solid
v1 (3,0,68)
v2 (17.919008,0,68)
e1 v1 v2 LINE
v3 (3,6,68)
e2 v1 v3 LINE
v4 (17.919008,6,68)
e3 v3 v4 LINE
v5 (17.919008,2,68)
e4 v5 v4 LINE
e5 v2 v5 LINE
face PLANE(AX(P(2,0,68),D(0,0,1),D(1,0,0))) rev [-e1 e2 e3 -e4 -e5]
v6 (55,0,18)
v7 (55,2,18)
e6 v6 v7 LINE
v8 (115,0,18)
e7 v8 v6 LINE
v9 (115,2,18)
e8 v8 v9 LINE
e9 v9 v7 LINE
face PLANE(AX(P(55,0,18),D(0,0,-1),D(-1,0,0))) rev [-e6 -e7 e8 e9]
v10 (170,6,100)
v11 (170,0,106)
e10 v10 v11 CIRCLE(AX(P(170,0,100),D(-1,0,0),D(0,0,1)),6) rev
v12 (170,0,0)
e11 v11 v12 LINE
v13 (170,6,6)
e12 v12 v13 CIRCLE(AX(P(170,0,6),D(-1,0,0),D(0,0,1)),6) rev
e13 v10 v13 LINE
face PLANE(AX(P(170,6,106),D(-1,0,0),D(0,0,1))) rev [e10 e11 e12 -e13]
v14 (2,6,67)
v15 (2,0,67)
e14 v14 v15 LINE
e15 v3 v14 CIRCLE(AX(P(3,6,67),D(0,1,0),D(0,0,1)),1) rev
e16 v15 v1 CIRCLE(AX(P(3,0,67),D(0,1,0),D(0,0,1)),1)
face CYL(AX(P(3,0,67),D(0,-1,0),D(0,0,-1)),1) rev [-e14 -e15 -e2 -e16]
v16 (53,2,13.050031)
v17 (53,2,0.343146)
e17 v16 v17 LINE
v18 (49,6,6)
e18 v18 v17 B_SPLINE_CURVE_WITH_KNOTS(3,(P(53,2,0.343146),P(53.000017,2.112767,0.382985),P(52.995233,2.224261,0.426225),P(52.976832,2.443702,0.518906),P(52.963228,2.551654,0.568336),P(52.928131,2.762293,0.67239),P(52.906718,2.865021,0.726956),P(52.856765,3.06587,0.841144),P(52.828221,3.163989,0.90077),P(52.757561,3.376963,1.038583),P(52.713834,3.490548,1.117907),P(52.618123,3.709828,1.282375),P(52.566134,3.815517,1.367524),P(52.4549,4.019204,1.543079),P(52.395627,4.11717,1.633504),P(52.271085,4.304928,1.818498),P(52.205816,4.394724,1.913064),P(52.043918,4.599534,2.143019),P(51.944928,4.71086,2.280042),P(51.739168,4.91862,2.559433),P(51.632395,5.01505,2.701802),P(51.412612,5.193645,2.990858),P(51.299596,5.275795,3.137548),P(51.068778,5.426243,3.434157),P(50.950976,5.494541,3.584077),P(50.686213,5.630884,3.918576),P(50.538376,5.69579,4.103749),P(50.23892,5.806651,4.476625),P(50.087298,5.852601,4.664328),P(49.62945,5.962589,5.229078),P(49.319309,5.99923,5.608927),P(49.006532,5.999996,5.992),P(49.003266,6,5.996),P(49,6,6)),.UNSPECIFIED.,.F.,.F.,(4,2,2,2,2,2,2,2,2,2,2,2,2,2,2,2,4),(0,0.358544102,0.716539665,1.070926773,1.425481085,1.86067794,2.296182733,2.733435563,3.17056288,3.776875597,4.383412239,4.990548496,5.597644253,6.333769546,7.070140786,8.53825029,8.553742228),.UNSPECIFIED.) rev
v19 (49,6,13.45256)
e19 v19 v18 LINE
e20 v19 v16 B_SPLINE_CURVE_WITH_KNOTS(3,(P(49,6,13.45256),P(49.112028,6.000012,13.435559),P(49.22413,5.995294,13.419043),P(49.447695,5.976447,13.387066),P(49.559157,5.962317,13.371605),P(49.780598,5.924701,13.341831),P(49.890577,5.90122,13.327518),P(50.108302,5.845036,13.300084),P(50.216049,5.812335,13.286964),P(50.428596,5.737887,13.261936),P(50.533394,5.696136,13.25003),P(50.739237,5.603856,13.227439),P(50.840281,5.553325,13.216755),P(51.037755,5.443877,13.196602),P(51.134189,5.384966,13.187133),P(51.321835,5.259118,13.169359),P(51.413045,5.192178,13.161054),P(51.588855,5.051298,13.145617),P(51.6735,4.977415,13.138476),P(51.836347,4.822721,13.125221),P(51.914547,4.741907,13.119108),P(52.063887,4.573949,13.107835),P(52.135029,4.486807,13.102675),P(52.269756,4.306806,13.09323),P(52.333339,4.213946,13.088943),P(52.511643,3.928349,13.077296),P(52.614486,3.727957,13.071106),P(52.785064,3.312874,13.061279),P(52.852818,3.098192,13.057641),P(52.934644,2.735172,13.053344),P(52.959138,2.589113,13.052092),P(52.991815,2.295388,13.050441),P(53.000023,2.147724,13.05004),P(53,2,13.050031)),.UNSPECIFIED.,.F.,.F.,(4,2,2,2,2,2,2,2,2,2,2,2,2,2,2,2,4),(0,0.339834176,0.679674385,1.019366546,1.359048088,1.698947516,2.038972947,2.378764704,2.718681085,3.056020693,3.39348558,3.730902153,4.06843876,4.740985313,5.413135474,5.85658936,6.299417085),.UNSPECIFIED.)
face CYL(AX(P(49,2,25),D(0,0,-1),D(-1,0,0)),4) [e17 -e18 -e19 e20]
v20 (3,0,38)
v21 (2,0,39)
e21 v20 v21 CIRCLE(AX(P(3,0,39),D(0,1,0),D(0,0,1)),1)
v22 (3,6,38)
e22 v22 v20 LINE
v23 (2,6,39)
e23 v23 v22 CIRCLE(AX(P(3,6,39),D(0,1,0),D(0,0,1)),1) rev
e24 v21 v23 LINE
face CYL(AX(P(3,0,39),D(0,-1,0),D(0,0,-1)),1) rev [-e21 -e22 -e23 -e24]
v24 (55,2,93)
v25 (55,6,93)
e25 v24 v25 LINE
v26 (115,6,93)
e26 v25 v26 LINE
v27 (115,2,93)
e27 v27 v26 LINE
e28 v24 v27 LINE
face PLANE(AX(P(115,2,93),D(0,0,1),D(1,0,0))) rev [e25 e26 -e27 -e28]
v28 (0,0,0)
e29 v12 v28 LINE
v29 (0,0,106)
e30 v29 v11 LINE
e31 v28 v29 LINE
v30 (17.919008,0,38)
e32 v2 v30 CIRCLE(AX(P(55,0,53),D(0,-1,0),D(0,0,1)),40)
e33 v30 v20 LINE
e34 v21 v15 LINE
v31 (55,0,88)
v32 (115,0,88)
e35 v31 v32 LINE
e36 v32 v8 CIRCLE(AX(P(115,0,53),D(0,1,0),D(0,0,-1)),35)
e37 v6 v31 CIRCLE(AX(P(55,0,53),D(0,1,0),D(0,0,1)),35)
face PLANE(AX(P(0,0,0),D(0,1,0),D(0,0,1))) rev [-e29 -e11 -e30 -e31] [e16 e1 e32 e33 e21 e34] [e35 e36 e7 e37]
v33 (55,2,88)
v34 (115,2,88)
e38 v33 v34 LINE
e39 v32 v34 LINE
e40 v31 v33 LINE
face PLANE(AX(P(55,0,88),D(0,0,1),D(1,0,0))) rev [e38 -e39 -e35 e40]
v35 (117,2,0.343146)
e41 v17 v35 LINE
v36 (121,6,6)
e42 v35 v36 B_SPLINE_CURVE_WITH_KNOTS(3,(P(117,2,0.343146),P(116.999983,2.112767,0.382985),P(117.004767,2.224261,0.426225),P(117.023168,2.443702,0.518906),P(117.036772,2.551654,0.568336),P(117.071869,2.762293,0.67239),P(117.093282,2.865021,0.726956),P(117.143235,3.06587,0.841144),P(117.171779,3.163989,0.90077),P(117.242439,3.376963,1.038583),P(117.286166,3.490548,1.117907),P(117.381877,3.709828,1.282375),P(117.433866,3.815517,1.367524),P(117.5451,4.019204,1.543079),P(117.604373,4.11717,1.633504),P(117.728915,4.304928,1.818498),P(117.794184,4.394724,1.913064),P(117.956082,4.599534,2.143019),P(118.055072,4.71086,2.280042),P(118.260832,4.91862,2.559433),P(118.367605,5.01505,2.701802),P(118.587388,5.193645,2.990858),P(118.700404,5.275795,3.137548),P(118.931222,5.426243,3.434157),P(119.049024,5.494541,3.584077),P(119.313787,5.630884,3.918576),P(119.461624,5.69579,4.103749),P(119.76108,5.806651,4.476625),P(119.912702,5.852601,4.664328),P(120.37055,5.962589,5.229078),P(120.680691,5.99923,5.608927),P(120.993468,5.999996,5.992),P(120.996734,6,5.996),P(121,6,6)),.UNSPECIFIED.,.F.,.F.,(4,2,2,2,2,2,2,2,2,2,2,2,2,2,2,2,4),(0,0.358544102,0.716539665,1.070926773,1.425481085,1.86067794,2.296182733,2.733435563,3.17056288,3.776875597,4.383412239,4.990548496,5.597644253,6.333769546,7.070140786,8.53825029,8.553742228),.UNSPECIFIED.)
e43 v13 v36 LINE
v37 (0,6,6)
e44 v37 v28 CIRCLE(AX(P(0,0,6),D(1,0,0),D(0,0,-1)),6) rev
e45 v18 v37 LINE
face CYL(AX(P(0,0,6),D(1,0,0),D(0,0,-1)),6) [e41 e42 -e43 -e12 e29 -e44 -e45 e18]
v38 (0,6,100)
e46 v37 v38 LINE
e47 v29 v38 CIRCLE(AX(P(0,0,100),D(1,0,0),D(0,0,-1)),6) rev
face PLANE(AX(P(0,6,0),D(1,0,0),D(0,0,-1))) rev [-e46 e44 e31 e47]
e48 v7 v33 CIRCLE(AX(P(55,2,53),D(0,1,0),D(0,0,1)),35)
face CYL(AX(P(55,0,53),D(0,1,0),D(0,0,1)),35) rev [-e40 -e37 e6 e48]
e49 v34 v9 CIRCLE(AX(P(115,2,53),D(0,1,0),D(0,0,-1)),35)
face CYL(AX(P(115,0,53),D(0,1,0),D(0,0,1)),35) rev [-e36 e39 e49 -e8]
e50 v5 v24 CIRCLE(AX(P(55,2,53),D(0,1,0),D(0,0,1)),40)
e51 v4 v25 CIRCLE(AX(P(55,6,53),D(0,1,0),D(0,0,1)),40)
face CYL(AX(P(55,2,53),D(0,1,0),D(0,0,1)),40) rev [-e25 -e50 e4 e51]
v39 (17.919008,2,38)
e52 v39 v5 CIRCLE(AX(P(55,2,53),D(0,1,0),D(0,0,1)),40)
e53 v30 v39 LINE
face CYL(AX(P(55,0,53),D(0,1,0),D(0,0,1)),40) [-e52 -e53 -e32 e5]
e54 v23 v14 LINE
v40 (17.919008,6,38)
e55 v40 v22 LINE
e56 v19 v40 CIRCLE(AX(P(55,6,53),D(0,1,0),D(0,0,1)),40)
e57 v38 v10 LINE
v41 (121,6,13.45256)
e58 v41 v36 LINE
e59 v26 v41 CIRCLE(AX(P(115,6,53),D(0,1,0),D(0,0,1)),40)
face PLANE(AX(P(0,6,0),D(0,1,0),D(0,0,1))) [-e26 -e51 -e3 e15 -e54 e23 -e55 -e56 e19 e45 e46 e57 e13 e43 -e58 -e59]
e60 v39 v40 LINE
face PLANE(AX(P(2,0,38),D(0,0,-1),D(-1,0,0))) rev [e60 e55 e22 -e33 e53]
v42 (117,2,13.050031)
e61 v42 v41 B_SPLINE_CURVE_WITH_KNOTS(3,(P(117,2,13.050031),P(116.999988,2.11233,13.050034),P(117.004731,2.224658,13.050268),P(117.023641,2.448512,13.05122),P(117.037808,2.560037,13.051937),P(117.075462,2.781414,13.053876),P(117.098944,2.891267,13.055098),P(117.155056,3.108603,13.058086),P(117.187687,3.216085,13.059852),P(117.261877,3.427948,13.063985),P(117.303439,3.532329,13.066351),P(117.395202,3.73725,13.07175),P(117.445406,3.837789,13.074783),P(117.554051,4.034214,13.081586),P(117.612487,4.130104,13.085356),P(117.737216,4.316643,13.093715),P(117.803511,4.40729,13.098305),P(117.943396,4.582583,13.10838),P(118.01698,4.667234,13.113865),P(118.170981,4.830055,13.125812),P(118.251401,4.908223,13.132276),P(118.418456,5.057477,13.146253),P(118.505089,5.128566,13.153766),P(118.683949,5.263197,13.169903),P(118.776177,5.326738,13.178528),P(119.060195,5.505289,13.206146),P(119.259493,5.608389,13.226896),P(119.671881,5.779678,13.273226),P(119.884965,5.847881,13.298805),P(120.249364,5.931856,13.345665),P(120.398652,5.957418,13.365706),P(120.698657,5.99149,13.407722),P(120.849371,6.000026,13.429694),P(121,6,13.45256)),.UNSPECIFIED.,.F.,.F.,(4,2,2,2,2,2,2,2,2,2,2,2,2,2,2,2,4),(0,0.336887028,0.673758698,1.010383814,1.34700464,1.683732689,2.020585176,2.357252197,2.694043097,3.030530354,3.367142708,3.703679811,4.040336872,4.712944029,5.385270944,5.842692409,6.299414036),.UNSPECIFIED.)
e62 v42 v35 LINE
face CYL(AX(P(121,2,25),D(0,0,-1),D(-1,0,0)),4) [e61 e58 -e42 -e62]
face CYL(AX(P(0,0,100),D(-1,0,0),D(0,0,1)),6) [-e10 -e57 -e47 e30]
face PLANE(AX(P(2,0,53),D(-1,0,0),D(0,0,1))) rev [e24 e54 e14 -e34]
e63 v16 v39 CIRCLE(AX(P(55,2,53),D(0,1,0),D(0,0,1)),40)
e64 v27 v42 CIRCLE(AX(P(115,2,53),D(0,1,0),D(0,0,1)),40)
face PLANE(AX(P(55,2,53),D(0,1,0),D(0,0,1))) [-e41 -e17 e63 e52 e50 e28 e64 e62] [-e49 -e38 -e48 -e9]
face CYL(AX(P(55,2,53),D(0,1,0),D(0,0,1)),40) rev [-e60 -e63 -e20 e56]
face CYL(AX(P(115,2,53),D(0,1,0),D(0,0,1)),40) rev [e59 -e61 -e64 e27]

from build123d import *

# Parameters (mm, degrees)
SKETCH1_W           = 170
SKETCH1_H           = 106
BOSS_EXTRUDE1_DEPTH = 6
FILLET1_R           = 6
CUT_EXTRUDE1_DEPTH  = 4
CUT_EXTRUDE2_DEPTH  = 201.429538741
CUT_EXTRUDE3_DEPTH  = 25
CUT_EXTRUDE4_DEPTH  = 201.379639771
FILLET2_R           = 1


with BuildPart() as part:
    # Sketch1 → Boss-Extrude1 (new body)
    with BuildSketch(Plane(origin=(0, 0, 0), x_dir=(1, 0, 0), z_dir=(0, 1, 0))):
        with Locations((85, -53)):
            Rectangle(SKETCH1_W, SKETCH1_H)
    extrude(amount=BOSS_EXTRUDE1_DEPTH)

    # Fillet1
    fillet1_edges = [part.edges().sort_by_distance(p)[0] for p in [
        (85, 6, 106),
        (85, 6, 0),
    ]]
    fillet(fillet1_edges, radius=FILLET1_R - 0.0001)  # a hair under: the kernel refuses the full size

    # Sketch2 → Cut-Extrude1 (cut)
    with BuildSketch(Plane(origin=(0, 6, 0), x_dir=(1, 0, 0), z_dir=(0, 1, 0))):
        with BuildLine():
            Line((55, -13), (115, -13))
            ThreePointArc((115, -13), (155, -53), (115, -93))
            Line((115, -93), (55, -93))
            ThreePointArc((55, -93), (15, -53), (55, -13))
        make_face()
    extrude(amount=-CUT_EXTRUDE1_DEPTH, mode=Mode.SUBTRACT)

    # Sketch3 → Cut-Extrude2 (cut, through all)
    with BuildSketch(Plane(origin=(0, 6, 0), x_dir=(1, 0, 0), z_dir=(0, 1, 0))):
        with BuildLine():
            Line((2, -53), (2, -38))
            Line((2, -38), (17.919007565, -38))
            ThreePointArc((17.919007565, -38), (15, -53), (17.919007565, -68))
            Line((17.919007565, -68), (2, -68))
            Line((2, -68), (2, -53))
        make_face()
    extrude(amount=-CUT_EXTRUDE2_DEPTH, mode=Mode.SUBTRACT)

    # Sketch5 → Cut-Extrude3 (cut)
    with BuildSketch(Plane.XY):
        with BuildLine():
            Line((49, 6), (121, 6))
            ThreePointArc((121, 6), (118.171572875, 4.828427125), (117, 2))
            Line((117, 2), (53, 2))
            ThreePointArc((53, 2), (51.828427125, 4.828427125), (49, 6))
        make_face()
    extrude(amount=CUT_EXTRUDE3_DEPTH, mode=Mode.SUBTRACT)

    # Sketch8 → Cut-Extrude4 (cut, through all)
    with BuildSketch(Plane(origin=(0, 2, 0), x_dir=(1, 0, 0), z_dir=(0, 1, 0))):
        with BuildLine():
            Line((55, -18), (115, -18))
            ThreePointArc((115, -18), (150, -53), (115, -88))
            Line((115, -88), (55, -88))
            ThreePointArc((55, -88), (20, -53), (55, -18))
        make_face()
    extrude(amount=-CUT_EXTRUDE4_DEPTH, mode=Mode.SUBTRACT)

    # Fillet2
    fillet2_edges = [part.edges().sort_by_distance(p)[0] for p in [
        (2, 3, 38),
        (2, 3, 68),
    ]]
    fillet(fillet2_edges, radius=FILLET2_R)


solid = part.part
